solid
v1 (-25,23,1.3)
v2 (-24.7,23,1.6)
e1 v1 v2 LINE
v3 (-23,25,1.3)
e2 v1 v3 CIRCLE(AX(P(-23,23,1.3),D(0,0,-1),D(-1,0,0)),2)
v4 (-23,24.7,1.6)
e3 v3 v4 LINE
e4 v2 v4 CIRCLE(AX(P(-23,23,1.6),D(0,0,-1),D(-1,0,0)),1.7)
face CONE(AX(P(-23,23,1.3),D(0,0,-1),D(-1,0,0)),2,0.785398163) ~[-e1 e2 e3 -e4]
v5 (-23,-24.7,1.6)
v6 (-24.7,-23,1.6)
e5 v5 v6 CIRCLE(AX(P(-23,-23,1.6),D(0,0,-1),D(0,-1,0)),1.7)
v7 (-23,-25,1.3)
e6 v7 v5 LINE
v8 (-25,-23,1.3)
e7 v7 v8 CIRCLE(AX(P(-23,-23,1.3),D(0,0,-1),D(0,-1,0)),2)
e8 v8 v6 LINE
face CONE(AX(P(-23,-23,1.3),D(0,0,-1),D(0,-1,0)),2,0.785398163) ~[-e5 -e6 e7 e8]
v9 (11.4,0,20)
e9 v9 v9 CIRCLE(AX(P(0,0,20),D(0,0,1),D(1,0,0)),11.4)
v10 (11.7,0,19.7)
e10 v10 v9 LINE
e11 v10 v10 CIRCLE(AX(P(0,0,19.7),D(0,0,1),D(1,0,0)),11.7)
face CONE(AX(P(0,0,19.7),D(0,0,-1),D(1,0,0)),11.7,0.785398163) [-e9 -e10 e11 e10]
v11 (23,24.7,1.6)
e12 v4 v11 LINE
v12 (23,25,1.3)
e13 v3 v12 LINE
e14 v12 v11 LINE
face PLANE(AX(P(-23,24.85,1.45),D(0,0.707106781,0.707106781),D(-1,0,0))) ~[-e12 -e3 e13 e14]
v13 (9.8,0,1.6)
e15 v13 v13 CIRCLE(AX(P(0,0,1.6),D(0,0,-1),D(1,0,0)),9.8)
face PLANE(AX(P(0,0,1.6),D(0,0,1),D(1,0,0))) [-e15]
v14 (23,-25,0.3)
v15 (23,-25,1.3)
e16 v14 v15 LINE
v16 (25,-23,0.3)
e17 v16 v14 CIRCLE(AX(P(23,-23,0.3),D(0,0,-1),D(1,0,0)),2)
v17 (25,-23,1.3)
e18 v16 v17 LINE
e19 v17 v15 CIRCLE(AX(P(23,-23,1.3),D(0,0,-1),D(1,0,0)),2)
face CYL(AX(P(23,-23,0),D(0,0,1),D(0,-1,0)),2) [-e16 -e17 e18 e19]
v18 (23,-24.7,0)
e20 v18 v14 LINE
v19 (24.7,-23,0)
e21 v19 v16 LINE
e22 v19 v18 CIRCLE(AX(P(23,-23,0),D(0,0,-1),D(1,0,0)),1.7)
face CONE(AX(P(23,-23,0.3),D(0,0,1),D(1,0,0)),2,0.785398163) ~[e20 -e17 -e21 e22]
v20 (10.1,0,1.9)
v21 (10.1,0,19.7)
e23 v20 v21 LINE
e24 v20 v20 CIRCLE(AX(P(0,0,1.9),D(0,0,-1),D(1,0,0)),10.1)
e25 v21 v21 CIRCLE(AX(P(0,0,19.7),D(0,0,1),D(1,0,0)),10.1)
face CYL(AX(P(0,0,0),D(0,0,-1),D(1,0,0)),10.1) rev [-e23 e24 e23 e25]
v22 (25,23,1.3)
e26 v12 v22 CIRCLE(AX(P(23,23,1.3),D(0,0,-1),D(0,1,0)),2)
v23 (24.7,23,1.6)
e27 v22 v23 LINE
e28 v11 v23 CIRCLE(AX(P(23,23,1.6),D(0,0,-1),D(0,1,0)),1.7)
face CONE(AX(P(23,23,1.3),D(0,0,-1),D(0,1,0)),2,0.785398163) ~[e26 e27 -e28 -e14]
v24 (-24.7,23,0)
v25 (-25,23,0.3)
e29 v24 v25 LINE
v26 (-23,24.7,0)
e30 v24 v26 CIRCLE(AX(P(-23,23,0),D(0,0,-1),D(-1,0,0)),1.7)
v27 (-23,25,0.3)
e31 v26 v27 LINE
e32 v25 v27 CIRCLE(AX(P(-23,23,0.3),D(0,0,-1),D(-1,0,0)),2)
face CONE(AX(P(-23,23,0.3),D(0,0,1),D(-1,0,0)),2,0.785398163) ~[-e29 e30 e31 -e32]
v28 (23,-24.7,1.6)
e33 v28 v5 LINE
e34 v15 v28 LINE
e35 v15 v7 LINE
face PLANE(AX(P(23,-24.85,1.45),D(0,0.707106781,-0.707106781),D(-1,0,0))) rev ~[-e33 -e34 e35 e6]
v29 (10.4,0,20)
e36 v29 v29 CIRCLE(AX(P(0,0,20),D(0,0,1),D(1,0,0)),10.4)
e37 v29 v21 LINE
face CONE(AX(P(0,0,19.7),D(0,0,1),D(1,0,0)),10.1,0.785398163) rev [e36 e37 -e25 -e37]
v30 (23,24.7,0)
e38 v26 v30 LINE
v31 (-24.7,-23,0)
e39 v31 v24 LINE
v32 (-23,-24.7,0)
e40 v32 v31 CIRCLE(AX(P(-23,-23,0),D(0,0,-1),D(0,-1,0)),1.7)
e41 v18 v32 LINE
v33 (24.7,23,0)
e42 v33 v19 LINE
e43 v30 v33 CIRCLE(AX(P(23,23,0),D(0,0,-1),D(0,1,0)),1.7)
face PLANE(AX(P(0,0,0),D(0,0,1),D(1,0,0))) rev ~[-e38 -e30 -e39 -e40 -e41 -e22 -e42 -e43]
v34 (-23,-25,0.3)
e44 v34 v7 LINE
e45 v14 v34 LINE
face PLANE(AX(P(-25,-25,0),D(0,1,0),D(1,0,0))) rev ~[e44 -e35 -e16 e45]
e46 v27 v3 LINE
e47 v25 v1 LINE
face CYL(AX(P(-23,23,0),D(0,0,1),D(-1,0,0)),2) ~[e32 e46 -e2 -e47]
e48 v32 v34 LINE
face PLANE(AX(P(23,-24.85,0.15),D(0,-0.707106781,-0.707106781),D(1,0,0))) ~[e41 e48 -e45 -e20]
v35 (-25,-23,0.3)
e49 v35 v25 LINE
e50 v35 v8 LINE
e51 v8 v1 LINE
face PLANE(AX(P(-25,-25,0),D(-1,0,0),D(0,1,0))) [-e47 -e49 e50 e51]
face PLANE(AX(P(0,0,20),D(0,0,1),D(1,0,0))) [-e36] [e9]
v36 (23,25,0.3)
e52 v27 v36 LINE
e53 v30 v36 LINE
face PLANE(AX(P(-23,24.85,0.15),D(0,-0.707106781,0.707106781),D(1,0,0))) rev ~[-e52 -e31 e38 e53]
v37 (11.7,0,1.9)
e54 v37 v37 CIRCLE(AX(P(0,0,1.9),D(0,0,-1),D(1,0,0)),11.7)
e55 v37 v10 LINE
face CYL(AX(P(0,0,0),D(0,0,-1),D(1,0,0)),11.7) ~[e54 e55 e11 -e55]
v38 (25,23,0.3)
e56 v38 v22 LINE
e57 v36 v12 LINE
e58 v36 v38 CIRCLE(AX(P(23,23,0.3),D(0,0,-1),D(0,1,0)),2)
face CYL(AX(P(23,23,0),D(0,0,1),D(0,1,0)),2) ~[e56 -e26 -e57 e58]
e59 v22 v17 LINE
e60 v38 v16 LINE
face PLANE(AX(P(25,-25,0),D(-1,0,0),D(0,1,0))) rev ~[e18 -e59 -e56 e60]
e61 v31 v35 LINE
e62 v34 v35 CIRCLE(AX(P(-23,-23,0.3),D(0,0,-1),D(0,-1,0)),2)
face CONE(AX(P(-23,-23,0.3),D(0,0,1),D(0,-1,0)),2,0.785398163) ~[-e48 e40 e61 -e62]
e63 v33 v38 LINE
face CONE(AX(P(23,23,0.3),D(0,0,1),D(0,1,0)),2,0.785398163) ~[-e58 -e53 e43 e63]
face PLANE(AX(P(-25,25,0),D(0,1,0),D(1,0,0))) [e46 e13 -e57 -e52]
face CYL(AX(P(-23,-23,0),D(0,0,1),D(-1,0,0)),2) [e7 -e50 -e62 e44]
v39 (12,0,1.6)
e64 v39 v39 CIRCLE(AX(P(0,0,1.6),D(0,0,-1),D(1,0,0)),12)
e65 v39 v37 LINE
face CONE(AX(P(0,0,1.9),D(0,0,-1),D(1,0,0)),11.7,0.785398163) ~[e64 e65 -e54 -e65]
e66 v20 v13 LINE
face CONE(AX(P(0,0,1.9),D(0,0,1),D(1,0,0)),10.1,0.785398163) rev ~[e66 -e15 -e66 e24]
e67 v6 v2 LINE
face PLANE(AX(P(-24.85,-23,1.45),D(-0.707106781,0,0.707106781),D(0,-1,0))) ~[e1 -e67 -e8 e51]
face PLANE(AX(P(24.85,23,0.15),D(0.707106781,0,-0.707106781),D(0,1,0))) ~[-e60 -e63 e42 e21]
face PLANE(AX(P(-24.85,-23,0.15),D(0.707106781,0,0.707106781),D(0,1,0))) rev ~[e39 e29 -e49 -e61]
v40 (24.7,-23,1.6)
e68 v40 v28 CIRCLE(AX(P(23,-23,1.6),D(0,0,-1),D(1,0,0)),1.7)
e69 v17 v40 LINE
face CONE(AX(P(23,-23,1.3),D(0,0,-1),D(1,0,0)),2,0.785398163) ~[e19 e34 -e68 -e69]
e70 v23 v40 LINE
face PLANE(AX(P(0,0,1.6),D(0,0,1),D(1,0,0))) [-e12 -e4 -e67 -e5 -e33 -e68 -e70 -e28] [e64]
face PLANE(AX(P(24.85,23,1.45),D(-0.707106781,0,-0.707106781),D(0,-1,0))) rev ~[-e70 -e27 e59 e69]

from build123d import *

# Parameters (mm, degrees)
F1_W     = 50
F1_H     = 50
F1_R     = 11.7
F1_R_2   = 10.1
F2_DEPTH = 1.6
F5_DEPTH = 20
F3_R     = 2
F4_SIZE  = 0.3


with BuildPart() as f2:
    # F1 (on Top) → F2 (new body)
    with BuildSketch(Plane.XY):
        Rectangle(F1_W, F1_H)
        Circle(F1_R, mode=Mode.SUBTRACT)
        Circle(F1_R)
        Circle(F1_R_2, mode=Mode.SUBTRACT)
        Circle(F1_R_2)
    extrude(amount=F2_DEPTH)

    # F1 (on Top) → F5 (join)
    with BuildSketch(Plane.XY):
        Circle(F1_R)
        Circle(F1_R_2, mode=Mode.SUBTRACT)
    extrude(amount=F5_DEPTH)

    # F3
    f3_edges = [f2.edges().sort_by_distance(p)[0] for p in [
        (25, 25, 0.8),
        (25, -25, 0.8),
        (-25, -25, 0.8),
        (-25, 25, 0.8),
    ]]
    fillet(f3_edges, radius=F3_R)

    # F4
    f4_edges = [f2.edges().sort_by_distance(p)[0] for p in [
        (0, 25, 1.6),
        (24.414214, 24.414214, 1.6),
        (-24.414214, 24.414214, 1.6),
        (25, 0, 1.6),
        (-25, 0, 1.6),
        (24.414214, -24.414214, 1.6),
        (-24.414214, -24.414214, 1.6),
        (0, -25, 1.6),
        (-11.7, 0, 1.6),
        (0, 25, 0),
        (24.414214, 24.414214, 0),
        (-24.414214, 24.414214, 0),
        (25, 0, 0),
        (-25, 0, 0),
        (24.414214, -24.414214, 0),
        (-24.414214, -24.414214, 0),
        (0, -25, 0),
        (-10.1, 0, 20),
        (-11.7, 0, 20),
        (-10.1, 0, 1.6),
    ]]
    chamfer(f4_edges, length=F4_SIZE)


solid = f2.part
